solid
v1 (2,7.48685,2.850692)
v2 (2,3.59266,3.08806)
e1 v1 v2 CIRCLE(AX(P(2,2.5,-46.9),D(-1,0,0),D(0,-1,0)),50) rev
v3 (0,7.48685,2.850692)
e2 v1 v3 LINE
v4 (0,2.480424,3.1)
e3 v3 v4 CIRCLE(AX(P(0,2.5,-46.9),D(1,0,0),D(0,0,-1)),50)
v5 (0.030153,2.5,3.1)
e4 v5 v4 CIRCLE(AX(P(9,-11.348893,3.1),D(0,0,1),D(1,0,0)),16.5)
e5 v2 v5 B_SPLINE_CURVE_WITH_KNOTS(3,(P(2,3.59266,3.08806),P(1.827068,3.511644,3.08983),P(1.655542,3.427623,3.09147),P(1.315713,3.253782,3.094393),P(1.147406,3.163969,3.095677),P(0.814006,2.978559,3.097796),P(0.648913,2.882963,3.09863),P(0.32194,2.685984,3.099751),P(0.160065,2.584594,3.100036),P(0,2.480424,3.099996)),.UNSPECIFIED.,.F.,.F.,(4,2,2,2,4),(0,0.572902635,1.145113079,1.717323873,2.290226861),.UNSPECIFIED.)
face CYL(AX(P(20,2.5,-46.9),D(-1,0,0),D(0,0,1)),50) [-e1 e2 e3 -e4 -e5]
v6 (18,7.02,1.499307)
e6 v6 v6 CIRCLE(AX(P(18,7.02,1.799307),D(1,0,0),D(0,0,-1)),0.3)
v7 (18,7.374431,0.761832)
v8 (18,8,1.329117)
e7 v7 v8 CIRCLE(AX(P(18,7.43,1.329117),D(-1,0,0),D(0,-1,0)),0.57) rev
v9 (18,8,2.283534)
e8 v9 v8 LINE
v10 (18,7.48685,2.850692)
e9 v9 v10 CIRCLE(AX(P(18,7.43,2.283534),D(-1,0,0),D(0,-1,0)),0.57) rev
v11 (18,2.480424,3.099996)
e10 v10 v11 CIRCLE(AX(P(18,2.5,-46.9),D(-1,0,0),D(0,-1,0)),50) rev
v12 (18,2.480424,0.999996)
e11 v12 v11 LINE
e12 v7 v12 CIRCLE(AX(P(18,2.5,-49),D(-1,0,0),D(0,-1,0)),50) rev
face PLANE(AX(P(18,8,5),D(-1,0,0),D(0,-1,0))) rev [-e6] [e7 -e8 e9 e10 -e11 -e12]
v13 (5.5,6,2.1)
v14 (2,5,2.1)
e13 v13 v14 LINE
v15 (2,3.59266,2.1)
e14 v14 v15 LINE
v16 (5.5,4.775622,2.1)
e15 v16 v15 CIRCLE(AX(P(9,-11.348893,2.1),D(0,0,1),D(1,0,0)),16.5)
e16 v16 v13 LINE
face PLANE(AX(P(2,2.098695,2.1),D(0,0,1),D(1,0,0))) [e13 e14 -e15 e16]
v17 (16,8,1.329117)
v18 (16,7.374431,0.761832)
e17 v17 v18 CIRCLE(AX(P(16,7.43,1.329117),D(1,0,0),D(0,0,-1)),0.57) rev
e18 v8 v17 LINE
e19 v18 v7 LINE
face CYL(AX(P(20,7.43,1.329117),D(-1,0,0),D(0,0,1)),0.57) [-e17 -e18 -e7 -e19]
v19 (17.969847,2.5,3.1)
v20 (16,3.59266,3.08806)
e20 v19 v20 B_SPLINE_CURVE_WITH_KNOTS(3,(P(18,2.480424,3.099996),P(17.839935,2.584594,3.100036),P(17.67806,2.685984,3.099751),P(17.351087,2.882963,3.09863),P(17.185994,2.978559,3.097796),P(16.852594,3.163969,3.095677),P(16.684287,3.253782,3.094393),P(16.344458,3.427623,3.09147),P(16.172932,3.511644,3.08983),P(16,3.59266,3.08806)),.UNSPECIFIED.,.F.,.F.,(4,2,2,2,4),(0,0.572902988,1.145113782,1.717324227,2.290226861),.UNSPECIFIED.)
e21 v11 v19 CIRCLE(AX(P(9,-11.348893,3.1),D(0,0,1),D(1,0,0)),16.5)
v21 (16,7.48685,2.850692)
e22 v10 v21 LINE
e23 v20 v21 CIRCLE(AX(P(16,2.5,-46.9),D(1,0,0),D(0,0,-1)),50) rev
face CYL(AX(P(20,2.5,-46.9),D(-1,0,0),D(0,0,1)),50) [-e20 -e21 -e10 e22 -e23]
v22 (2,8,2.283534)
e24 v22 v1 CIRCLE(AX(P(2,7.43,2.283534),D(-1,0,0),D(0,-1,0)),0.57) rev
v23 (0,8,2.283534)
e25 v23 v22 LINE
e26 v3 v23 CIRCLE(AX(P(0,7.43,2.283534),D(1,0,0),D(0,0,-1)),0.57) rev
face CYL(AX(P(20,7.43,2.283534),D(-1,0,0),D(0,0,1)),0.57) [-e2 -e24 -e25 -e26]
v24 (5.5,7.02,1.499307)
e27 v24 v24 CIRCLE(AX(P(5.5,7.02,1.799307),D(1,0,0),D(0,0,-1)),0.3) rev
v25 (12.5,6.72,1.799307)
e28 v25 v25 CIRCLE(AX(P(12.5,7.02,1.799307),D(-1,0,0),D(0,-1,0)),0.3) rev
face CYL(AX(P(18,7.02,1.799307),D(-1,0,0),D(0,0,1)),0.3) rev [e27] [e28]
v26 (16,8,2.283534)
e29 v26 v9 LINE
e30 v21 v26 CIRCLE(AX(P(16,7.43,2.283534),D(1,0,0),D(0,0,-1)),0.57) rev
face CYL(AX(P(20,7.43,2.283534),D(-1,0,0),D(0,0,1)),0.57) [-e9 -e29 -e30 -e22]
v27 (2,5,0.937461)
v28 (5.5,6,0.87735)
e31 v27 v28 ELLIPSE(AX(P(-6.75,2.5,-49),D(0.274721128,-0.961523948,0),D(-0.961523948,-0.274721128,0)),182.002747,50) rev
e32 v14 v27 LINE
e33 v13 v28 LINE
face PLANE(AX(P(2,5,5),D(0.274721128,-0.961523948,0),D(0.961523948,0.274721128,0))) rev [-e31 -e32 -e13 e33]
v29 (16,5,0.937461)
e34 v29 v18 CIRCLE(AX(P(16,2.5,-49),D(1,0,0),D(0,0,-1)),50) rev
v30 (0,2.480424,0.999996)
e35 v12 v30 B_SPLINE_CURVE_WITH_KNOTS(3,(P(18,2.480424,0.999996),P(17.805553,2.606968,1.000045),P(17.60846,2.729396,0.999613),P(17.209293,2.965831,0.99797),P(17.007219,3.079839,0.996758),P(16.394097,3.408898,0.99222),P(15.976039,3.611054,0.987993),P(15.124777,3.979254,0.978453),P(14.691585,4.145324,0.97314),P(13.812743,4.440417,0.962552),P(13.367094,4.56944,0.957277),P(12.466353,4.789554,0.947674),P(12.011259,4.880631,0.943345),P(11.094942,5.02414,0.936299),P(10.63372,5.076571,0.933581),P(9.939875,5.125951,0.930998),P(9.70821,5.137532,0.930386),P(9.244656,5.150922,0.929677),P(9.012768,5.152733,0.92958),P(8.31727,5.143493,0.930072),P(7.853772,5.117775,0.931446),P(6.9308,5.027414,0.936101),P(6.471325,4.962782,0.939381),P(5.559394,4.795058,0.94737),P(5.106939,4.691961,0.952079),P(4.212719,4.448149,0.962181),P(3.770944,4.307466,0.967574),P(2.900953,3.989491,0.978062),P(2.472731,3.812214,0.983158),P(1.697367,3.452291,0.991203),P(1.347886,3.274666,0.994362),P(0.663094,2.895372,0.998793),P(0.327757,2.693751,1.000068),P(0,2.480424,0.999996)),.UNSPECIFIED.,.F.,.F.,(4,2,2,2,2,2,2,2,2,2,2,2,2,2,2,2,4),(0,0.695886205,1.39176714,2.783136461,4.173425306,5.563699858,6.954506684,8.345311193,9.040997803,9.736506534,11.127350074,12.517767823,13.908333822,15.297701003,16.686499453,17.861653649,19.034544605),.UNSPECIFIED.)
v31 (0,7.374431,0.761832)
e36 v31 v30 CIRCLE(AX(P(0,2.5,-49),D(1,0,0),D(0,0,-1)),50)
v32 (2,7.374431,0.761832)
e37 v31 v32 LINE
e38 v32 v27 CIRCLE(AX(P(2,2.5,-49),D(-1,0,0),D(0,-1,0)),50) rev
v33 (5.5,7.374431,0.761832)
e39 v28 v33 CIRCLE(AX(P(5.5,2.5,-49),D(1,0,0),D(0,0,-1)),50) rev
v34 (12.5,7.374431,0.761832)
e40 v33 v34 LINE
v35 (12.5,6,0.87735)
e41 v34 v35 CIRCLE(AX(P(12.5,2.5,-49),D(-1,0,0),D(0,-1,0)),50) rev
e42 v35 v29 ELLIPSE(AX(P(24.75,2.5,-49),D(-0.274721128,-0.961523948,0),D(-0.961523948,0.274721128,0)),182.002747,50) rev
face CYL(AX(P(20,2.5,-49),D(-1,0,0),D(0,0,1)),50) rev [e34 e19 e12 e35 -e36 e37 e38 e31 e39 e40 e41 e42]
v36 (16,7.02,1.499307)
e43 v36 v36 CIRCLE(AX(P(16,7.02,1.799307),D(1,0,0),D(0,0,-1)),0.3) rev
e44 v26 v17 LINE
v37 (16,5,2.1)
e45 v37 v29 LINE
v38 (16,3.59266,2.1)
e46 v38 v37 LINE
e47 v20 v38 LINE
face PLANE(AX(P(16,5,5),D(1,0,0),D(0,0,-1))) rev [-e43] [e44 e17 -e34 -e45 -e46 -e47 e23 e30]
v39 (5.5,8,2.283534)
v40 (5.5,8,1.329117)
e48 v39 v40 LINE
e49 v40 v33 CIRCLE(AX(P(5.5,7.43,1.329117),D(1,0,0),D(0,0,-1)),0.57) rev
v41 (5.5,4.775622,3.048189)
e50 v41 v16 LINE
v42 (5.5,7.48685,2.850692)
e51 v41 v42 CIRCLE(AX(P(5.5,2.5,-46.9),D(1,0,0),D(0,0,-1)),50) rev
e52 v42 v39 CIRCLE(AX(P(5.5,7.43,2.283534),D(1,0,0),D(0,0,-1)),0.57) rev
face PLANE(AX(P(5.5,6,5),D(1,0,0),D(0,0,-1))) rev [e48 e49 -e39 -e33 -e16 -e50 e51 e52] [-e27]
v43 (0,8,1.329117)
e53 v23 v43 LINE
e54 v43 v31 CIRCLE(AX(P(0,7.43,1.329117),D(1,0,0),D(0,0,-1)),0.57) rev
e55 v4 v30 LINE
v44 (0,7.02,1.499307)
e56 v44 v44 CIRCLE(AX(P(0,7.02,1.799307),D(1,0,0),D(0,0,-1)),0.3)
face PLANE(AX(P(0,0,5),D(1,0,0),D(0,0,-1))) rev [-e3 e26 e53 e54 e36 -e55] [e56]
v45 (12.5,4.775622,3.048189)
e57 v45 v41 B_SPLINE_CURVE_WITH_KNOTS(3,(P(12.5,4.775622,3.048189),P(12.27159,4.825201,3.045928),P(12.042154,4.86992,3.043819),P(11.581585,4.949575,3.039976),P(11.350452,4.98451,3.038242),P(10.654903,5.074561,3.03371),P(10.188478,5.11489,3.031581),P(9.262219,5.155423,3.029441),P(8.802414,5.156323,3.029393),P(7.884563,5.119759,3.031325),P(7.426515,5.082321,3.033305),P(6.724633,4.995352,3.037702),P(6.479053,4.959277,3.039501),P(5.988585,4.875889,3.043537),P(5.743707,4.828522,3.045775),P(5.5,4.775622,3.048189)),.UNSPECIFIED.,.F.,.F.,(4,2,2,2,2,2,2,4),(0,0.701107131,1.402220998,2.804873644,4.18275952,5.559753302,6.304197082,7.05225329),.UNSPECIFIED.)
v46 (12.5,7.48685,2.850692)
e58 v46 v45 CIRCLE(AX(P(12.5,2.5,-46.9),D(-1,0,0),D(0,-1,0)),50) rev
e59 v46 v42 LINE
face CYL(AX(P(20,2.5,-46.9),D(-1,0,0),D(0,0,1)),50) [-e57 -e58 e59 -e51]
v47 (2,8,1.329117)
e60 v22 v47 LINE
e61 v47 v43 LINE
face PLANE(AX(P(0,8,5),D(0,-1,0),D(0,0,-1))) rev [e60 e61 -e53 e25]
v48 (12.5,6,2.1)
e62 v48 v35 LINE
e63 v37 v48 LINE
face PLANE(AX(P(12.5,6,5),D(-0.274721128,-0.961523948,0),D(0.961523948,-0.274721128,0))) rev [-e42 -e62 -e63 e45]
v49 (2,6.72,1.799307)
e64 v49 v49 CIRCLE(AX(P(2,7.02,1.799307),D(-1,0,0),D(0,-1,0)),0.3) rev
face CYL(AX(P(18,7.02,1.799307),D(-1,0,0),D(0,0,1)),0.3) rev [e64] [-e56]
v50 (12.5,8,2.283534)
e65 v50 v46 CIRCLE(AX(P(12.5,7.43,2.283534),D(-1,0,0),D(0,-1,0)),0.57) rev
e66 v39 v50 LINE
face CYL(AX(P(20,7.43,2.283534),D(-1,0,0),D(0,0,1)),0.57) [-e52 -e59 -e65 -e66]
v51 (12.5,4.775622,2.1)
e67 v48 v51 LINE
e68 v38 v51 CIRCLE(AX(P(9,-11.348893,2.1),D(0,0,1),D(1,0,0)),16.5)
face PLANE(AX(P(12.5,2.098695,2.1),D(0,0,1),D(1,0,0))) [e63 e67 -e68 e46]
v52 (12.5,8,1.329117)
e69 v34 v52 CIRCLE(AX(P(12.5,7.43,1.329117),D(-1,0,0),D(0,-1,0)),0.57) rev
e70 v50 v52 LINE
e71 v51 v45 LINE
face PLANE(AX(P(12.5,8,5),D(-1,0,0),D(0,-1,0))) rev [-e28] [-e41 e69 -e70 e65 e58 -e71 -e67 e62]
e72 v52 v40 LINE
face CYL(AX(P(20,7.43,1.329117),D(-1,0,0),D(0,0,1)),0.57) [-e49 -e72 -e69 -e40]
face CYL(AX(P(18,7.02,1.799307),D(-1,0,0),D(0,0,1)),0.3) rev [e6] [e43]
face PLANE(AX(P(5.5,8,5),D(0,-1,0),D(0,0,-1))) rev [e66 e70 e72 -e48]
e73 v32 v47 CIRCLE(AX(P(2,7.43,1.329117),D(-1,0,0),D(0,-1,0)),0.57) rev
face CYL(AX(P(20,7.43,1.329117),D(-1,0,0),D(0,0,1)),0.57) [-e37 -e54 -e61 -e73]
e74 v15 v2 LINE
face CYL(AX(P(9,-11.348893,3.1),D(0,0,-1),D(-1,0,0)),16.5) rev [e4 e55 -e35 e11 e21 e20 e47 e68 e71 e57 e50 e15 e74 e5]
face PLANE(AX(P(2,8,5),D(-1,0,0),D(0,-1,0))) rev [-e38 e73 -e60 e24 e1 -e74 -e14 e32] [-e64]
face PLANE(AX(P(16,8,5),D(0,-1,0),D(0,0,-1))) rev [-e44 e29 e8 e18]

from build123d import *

# Parameters (mm, degrees)
BOSS_EXTRUDE2_DEPTH = 5
SKETCH8_R           = 50
CUT_EXTRUDE6_DEPTH  = 20
SKETCH9_OUTSIDE_W   = 10.609
SKETCH9_OUTSIDE_H   = 17.306
SKETCH9_OUTSIDE_R   = 50
CUT_EXTRUDE7_DEPTH  = 20
SKETCH11_W          = 2
SKETCH11_H          = 8
SKETCH11_W_2        = 7
BOSS_EXTRUDE4_DEPTH = 2
CUT_EXTRUDE8_DEPTH  = 18
SKETCH13_R          = 0.3
CUT_EXTRUDE10_DEPTH = 20.940160481
SKETCH14_R          = 0.3
CUT_EXTRUDE11_DEPTH = 20
FILLET1_R           = 0.57
SKETCH15_R          = 16.5
CUT_EXTRUDE12_DEPTH = 20.940160481
SKETCH16_W          = 3.5
SKETCH16_H          = 4.171301815
SKETCH16_H_2        = 4.584730653
CUT_EXTRUDE14_DEPTH = 3.5


# Read off the part's stored shape, not the designer's step: Cut-Extrude8
with BuildPart() as part:
    # Sketch1 → Boss-Extrude2 (new body)
    with BuildSketch(Plane.XY):
        Polygon((0, 0), (0, 8), (2, 8), (2, 5), (5.5, 6), (5.5, 8), (12.5, 8), (12.5, 6), (16, 5), (16, 8), (18, 8), (18, 0), (16, 0), (16, -3), (12.5, -2), (12.5, 0), (5.5, 0), (5.5, -2), (2, -3), (2, 0), align=None)
    extrude(amount=BOSS_EXTRUDE2_DEPTH)

    # Sketch8 → Cut-Extrude6 (cut)
    with BuildSketch(Plane(origin=(0, 0, 0), x_dir=(0, 0, -1), z_dir=(1, 0, 0))):
        with Locations((49, 2.5)):
            Circle(SKETCH8_R)
    extrude(amount=CUT_EXTRUDE6_DEPTH, mode=Mode.SUBTRACT)

    # Sketch9 outside → Cut-Extrude7 (cut)
    with BuildSketch(Plane(origin=(0, 0, 0), x_dir=(0, 0, -1), z_dir=(1, 0, 0))):
        with Locations((-2.8485, 2.5)):
            Rectangle(SKETCH9_OUTSIDE_W, SKETCH9_OUTSIDE_H)
        with Locations((47.1, 2.5)):
            Circle(SKETCH9_OUTSIDE_R, mode=Mode.SUBTRACT)
    extrude(amount=CUT_EXTRUDE7_DEPTH, mode=Mode.SUBTRACT)

    # Sketch11 → Boss-Extrude4 (add)
    with BuildSketch(Plane.XY.offset(4)):
        with Locations((1, 4)):
            Rectangle(SKETCH11_W, SKETCH11_H)
        with Locations((9, 4)):
            Rectangle(SKETCH11_W_2, SKETCH11_H)
        with Locations((17, 4)):
            Rectangle(SKETCH11_W, SKETCH11_H)
    extrude(amount=-BOSS_EXTRUDE4_DEPTH)

    # Cut-Extrude8 outline → Cut-Extrude8 (cut)
    with BuildSketch(Plane(origin=(0, 0, 0), x_dir=(0, 0, -1), z_dir=(1, 0, 0))):
        with BuildLine():
            Line((-4, 0), (-3.037460889, 0))
            ThreePointArc((-3.037460889, 0), (-3.07734981, 4.004827558), (-2.796579359, 8))
            Line((-2.796579359, 8), (-4, 8))
            Line((-4, 8), (-4, 0))
        make_face()
    extrude(amount=CUT_EXTRUDE8_DEPTH, mode=Mode.SUBTRACT)

    # Sketch13 → Cut-Extrude10 (cut, through all)
    with BuildSketch(Plane(origin=(0, 0, 0), x_dir=(0, 0, -1), z_dir=(1, 0, 0))):
        with Locations(Location((-1.799307082, 7.02, 0), (0, 0, 270))):
            Circle(SKETCH13_R)
    extrude(amount=CUT_EXTRUDE10_DEPTH, mode=Mode.SUBTRACT)

    # Sketch14 → Cut-Extrude11 (cut)
    with BuildSketch(Plane(origin=(0, 0, 0), x_dir=(0, 0, -1), z_dir=(1, 0, 0))):
        with Locations(Location((-1.865607241, -1.2, 0), (0, 0, 270))):
            Circle(SKETCH14_R)
    extrude(amount=CUT_EXTRUDE11_DEPTH, mode=Mode.SUBTRACT)

    # Fillet1
    # the kernel refuses this fillet: 0.57 mm, written as the material it takes off along each edge
    with BuildSketch(Plane(origin=(16, 0, 3.037460889), x_dir=(0, 0, -1), z_dir=(1, 0, 0))) as fillet1_piece_1:
        with BuildLine():
            CenterArc((0.545153795, 0.57), FILLET1_R, 182.237689069, 87.762310931)
            ThreePointArc((-0.02441155, 0.547744285), (-0.012956585, 0.273838681), (0, 0))
            Line((0, 0), (0.545153795, 0))
        make_face()
    extrude(amount=3.370719987, mode=Mode.SUBTRACT)
    with BuildSketch(Plane(origin=(14.71001217, 8, 2.796579359), x_dir=(0, 0, -1), z_dir=(1, 0, 0)), Plane(origin=(-1.28998783, 8, 2.796579359), x_dir=(0, 0, -1), z_dir=(1, 0, 0))) as fillet1_piece_2:
        with BuildLine():
            CenterArc((0.513045529, -0.57), FILLET1_R, 90, 84.275973917)
            ThreePointArc((-0.054112356, -0.513149909), (-0.02771814, -0.25650515), (0, 0))
            Line((0, 0), (0.513045529, 0))
        make_face()
    extrude(amount=4.57997566, mode=Mode.SUBTRACT)
    with BuildSketch(Plane(origin=(5.5, 0, 3.037460889), x_dir=(0, 0, -1), z_dir=(1, 0, 0))) as fillet1_piece_3:
        with BuildLine():
            CenterArc((0.545153795, 0.57), FILLET1_R, 182.237689069, 87.762310931)
            ThreePointArc((-0.02441155, 0.547744285), (-0.012956585, 0.273838681), (0, 0))
            Line((0, 0), (0.545153795, 0))
        make_face()
    extrude(amount=7, mode=Mode.SUBTRACT)
    with BuildSketch(Plane(origin=(4.21001217, 8, 2.796579359), x_dir=(0, 0, -1), z_dir=(1, 0, 0))) as fillet1_piece_4:
        with BuildLine():
            CenterArc((0.513045529, -0.57), FILLET1_R, 90, 84.275973917)
            ThreePointArc((-0.054112356, -0.513149909), (-0.02771814, -0.25650515), (0, 0))
            Line((0, 0), (0.513045529, 0))
        make_face()
    extrude(amount=9.57997566, mode=Mode.SUBTRACT)
    with BuildSketch(Plane(origin=(-1.370719987, 0, 3.037460889), x_dir=(0, 0.9990083494743675, 0.044523226303807895), z_dir=(1, 0, 0))) as fillet1_piece_5:
        with BuildLine():
            CenterArc((0.545162753, -0.569991432), FILLET1_R, 89.685852545, 87.762310931)
            Line((-0.024272006, -0.544613193), (0, 0))
            ThreePointArc((0, 0), (0.274143997, 0.000751555), (0.548287995, 0))
        make_face()
    extrude(amount=3.370719987, mode=Mode.SUBTRACT)
    with BuildSketch(Plane(origin=(2, 0, 0.937460889), x_dir=(0, 0.9990278617443559, 0.04408323330360469), z_dir=(-1, 0, 0)), Plane(origin=(19.489241357, 0, 0.937460889), x_dir=(0, 0.9990278617443559, 0.04408323330360409), z_dir=(-1, 0, 0))) as fillet1_piece_6:
        with BuildLine():
            CenterArc((0.595706111, -0.569990001), FILLET1_R, 90.339381978, 92.187220026)
            Line((0.02626023, -0.595117444), (0, 0))
            ThreePointArc((0, 0), (0.296164915, -0.000877144), (0.592329831, 0))
        make_face()
    extrude(amount=3.489241357, mode=Mode.SUBTRACT)
    with BuildSketch(Plane(origin=(3.581343655, 8, 0.696579359), x_dir=(0, 0, 1), z_dir=(-1, 0, 0))) as fillet1_piece_7:
        with BuildLine():
            CenterArc((0.632537462, -0.57), FILLET1_R, 90, 95.594572842)
            ThreePointArc((0.065252578, -0.625568519), (0.033609947, -0.312681655), (0, 0))
            Line((0, 0), (0.632537462, 0))
        make_face()
    extrude(amount=5.16268731, mode=Mode.SUBTRACT)
    with BuildSketch(Plane(origin=(14.081343655, 8, 0.696579359), x_dir=(0, -0.9946037861150897, 0.1037463669027923), z_dir=(-1, 0, 0))) as fillet1_piece_8:
        with BuildLine():
            CenterArc((0.632547622, 0.569988725), FILLET1_R, 174.045055794, 95.594572842)
            Line((0.065623464, 0.629124155), (0, 0))
            ThreePointArc((0, 0), (0.314481268, 0.000988994), (0.628962535, 0))
        make_face()
    extrude(amount=10.16268731, mode=Mode.SUBTRACT)
    with BuildSketch(Plane(origin=(19.581343655, 8, 0.696579359), x_dir=(0, -0.9946037861150897, 0.1037463669027923), z_dir=(-1, 0, 0))) as fillet1_piece_9:
        with BuildLine():
            CenterArc((0.632547622, 0.569988725), FILLET1_R, 174.045055794, 95.594572842)
            Line((0.065623464, 0.629124155), (0, 0))
            ThreePointArc((0, 0), (0.314481268, 0.000988994), (0.628962535, 0))
        make_face()
    extrude(amount=5.16268731, mode=Mode.SUBTRACT)
    with BuildSketch(Plane(origin=(12.5, 0, 0.937460889), x_dir=(0, 0.9990278617443559, 0.04408323330360469), z_dir=(-1, 0, 0))) as fillet1_piece_10:
        with BuildLine():
            CenterArc((0.595706111, -0.569990001), FILLET1_R, 90.339381978, 92.187220026)
            Line((0.02626023, -0.595117444), (0, 0))
            ThreePointArc((0, 0), (0.296164915, -0.000877144), (0.592329831, 0))
        make_face()
    extrude(amount=7, mode=Mode.SUBTRACT)

    # Sketch15 → Cut-Extrude12 (cut, through all)
    with BuildSketch(Plane.XY):
        with Locations((9, -11.34889303)):
            Circle(SKETCH15_R)
    extrude(amount=CUT_EXTRUDE12_DEPTH, mode=Mode.SUBTRACT)

    # Sketch16 → Cut-Extrude14 (cut)
    with BuildSketch(Plane.XY.offset(5.6)):
        with Locations((3.75, 4.184345942)):
            Rectangle(SKETCH16_W, SKETCH16_H)
        with Locations((14.25, 4.391060361)):
            Rectangle(SKETCH16_W, SKETCH16_H_2)
    extrude(amount=-CUT_EXTRUDE14_DEPTH, mode=Mode.SUBTRACT)


solid = part.part
